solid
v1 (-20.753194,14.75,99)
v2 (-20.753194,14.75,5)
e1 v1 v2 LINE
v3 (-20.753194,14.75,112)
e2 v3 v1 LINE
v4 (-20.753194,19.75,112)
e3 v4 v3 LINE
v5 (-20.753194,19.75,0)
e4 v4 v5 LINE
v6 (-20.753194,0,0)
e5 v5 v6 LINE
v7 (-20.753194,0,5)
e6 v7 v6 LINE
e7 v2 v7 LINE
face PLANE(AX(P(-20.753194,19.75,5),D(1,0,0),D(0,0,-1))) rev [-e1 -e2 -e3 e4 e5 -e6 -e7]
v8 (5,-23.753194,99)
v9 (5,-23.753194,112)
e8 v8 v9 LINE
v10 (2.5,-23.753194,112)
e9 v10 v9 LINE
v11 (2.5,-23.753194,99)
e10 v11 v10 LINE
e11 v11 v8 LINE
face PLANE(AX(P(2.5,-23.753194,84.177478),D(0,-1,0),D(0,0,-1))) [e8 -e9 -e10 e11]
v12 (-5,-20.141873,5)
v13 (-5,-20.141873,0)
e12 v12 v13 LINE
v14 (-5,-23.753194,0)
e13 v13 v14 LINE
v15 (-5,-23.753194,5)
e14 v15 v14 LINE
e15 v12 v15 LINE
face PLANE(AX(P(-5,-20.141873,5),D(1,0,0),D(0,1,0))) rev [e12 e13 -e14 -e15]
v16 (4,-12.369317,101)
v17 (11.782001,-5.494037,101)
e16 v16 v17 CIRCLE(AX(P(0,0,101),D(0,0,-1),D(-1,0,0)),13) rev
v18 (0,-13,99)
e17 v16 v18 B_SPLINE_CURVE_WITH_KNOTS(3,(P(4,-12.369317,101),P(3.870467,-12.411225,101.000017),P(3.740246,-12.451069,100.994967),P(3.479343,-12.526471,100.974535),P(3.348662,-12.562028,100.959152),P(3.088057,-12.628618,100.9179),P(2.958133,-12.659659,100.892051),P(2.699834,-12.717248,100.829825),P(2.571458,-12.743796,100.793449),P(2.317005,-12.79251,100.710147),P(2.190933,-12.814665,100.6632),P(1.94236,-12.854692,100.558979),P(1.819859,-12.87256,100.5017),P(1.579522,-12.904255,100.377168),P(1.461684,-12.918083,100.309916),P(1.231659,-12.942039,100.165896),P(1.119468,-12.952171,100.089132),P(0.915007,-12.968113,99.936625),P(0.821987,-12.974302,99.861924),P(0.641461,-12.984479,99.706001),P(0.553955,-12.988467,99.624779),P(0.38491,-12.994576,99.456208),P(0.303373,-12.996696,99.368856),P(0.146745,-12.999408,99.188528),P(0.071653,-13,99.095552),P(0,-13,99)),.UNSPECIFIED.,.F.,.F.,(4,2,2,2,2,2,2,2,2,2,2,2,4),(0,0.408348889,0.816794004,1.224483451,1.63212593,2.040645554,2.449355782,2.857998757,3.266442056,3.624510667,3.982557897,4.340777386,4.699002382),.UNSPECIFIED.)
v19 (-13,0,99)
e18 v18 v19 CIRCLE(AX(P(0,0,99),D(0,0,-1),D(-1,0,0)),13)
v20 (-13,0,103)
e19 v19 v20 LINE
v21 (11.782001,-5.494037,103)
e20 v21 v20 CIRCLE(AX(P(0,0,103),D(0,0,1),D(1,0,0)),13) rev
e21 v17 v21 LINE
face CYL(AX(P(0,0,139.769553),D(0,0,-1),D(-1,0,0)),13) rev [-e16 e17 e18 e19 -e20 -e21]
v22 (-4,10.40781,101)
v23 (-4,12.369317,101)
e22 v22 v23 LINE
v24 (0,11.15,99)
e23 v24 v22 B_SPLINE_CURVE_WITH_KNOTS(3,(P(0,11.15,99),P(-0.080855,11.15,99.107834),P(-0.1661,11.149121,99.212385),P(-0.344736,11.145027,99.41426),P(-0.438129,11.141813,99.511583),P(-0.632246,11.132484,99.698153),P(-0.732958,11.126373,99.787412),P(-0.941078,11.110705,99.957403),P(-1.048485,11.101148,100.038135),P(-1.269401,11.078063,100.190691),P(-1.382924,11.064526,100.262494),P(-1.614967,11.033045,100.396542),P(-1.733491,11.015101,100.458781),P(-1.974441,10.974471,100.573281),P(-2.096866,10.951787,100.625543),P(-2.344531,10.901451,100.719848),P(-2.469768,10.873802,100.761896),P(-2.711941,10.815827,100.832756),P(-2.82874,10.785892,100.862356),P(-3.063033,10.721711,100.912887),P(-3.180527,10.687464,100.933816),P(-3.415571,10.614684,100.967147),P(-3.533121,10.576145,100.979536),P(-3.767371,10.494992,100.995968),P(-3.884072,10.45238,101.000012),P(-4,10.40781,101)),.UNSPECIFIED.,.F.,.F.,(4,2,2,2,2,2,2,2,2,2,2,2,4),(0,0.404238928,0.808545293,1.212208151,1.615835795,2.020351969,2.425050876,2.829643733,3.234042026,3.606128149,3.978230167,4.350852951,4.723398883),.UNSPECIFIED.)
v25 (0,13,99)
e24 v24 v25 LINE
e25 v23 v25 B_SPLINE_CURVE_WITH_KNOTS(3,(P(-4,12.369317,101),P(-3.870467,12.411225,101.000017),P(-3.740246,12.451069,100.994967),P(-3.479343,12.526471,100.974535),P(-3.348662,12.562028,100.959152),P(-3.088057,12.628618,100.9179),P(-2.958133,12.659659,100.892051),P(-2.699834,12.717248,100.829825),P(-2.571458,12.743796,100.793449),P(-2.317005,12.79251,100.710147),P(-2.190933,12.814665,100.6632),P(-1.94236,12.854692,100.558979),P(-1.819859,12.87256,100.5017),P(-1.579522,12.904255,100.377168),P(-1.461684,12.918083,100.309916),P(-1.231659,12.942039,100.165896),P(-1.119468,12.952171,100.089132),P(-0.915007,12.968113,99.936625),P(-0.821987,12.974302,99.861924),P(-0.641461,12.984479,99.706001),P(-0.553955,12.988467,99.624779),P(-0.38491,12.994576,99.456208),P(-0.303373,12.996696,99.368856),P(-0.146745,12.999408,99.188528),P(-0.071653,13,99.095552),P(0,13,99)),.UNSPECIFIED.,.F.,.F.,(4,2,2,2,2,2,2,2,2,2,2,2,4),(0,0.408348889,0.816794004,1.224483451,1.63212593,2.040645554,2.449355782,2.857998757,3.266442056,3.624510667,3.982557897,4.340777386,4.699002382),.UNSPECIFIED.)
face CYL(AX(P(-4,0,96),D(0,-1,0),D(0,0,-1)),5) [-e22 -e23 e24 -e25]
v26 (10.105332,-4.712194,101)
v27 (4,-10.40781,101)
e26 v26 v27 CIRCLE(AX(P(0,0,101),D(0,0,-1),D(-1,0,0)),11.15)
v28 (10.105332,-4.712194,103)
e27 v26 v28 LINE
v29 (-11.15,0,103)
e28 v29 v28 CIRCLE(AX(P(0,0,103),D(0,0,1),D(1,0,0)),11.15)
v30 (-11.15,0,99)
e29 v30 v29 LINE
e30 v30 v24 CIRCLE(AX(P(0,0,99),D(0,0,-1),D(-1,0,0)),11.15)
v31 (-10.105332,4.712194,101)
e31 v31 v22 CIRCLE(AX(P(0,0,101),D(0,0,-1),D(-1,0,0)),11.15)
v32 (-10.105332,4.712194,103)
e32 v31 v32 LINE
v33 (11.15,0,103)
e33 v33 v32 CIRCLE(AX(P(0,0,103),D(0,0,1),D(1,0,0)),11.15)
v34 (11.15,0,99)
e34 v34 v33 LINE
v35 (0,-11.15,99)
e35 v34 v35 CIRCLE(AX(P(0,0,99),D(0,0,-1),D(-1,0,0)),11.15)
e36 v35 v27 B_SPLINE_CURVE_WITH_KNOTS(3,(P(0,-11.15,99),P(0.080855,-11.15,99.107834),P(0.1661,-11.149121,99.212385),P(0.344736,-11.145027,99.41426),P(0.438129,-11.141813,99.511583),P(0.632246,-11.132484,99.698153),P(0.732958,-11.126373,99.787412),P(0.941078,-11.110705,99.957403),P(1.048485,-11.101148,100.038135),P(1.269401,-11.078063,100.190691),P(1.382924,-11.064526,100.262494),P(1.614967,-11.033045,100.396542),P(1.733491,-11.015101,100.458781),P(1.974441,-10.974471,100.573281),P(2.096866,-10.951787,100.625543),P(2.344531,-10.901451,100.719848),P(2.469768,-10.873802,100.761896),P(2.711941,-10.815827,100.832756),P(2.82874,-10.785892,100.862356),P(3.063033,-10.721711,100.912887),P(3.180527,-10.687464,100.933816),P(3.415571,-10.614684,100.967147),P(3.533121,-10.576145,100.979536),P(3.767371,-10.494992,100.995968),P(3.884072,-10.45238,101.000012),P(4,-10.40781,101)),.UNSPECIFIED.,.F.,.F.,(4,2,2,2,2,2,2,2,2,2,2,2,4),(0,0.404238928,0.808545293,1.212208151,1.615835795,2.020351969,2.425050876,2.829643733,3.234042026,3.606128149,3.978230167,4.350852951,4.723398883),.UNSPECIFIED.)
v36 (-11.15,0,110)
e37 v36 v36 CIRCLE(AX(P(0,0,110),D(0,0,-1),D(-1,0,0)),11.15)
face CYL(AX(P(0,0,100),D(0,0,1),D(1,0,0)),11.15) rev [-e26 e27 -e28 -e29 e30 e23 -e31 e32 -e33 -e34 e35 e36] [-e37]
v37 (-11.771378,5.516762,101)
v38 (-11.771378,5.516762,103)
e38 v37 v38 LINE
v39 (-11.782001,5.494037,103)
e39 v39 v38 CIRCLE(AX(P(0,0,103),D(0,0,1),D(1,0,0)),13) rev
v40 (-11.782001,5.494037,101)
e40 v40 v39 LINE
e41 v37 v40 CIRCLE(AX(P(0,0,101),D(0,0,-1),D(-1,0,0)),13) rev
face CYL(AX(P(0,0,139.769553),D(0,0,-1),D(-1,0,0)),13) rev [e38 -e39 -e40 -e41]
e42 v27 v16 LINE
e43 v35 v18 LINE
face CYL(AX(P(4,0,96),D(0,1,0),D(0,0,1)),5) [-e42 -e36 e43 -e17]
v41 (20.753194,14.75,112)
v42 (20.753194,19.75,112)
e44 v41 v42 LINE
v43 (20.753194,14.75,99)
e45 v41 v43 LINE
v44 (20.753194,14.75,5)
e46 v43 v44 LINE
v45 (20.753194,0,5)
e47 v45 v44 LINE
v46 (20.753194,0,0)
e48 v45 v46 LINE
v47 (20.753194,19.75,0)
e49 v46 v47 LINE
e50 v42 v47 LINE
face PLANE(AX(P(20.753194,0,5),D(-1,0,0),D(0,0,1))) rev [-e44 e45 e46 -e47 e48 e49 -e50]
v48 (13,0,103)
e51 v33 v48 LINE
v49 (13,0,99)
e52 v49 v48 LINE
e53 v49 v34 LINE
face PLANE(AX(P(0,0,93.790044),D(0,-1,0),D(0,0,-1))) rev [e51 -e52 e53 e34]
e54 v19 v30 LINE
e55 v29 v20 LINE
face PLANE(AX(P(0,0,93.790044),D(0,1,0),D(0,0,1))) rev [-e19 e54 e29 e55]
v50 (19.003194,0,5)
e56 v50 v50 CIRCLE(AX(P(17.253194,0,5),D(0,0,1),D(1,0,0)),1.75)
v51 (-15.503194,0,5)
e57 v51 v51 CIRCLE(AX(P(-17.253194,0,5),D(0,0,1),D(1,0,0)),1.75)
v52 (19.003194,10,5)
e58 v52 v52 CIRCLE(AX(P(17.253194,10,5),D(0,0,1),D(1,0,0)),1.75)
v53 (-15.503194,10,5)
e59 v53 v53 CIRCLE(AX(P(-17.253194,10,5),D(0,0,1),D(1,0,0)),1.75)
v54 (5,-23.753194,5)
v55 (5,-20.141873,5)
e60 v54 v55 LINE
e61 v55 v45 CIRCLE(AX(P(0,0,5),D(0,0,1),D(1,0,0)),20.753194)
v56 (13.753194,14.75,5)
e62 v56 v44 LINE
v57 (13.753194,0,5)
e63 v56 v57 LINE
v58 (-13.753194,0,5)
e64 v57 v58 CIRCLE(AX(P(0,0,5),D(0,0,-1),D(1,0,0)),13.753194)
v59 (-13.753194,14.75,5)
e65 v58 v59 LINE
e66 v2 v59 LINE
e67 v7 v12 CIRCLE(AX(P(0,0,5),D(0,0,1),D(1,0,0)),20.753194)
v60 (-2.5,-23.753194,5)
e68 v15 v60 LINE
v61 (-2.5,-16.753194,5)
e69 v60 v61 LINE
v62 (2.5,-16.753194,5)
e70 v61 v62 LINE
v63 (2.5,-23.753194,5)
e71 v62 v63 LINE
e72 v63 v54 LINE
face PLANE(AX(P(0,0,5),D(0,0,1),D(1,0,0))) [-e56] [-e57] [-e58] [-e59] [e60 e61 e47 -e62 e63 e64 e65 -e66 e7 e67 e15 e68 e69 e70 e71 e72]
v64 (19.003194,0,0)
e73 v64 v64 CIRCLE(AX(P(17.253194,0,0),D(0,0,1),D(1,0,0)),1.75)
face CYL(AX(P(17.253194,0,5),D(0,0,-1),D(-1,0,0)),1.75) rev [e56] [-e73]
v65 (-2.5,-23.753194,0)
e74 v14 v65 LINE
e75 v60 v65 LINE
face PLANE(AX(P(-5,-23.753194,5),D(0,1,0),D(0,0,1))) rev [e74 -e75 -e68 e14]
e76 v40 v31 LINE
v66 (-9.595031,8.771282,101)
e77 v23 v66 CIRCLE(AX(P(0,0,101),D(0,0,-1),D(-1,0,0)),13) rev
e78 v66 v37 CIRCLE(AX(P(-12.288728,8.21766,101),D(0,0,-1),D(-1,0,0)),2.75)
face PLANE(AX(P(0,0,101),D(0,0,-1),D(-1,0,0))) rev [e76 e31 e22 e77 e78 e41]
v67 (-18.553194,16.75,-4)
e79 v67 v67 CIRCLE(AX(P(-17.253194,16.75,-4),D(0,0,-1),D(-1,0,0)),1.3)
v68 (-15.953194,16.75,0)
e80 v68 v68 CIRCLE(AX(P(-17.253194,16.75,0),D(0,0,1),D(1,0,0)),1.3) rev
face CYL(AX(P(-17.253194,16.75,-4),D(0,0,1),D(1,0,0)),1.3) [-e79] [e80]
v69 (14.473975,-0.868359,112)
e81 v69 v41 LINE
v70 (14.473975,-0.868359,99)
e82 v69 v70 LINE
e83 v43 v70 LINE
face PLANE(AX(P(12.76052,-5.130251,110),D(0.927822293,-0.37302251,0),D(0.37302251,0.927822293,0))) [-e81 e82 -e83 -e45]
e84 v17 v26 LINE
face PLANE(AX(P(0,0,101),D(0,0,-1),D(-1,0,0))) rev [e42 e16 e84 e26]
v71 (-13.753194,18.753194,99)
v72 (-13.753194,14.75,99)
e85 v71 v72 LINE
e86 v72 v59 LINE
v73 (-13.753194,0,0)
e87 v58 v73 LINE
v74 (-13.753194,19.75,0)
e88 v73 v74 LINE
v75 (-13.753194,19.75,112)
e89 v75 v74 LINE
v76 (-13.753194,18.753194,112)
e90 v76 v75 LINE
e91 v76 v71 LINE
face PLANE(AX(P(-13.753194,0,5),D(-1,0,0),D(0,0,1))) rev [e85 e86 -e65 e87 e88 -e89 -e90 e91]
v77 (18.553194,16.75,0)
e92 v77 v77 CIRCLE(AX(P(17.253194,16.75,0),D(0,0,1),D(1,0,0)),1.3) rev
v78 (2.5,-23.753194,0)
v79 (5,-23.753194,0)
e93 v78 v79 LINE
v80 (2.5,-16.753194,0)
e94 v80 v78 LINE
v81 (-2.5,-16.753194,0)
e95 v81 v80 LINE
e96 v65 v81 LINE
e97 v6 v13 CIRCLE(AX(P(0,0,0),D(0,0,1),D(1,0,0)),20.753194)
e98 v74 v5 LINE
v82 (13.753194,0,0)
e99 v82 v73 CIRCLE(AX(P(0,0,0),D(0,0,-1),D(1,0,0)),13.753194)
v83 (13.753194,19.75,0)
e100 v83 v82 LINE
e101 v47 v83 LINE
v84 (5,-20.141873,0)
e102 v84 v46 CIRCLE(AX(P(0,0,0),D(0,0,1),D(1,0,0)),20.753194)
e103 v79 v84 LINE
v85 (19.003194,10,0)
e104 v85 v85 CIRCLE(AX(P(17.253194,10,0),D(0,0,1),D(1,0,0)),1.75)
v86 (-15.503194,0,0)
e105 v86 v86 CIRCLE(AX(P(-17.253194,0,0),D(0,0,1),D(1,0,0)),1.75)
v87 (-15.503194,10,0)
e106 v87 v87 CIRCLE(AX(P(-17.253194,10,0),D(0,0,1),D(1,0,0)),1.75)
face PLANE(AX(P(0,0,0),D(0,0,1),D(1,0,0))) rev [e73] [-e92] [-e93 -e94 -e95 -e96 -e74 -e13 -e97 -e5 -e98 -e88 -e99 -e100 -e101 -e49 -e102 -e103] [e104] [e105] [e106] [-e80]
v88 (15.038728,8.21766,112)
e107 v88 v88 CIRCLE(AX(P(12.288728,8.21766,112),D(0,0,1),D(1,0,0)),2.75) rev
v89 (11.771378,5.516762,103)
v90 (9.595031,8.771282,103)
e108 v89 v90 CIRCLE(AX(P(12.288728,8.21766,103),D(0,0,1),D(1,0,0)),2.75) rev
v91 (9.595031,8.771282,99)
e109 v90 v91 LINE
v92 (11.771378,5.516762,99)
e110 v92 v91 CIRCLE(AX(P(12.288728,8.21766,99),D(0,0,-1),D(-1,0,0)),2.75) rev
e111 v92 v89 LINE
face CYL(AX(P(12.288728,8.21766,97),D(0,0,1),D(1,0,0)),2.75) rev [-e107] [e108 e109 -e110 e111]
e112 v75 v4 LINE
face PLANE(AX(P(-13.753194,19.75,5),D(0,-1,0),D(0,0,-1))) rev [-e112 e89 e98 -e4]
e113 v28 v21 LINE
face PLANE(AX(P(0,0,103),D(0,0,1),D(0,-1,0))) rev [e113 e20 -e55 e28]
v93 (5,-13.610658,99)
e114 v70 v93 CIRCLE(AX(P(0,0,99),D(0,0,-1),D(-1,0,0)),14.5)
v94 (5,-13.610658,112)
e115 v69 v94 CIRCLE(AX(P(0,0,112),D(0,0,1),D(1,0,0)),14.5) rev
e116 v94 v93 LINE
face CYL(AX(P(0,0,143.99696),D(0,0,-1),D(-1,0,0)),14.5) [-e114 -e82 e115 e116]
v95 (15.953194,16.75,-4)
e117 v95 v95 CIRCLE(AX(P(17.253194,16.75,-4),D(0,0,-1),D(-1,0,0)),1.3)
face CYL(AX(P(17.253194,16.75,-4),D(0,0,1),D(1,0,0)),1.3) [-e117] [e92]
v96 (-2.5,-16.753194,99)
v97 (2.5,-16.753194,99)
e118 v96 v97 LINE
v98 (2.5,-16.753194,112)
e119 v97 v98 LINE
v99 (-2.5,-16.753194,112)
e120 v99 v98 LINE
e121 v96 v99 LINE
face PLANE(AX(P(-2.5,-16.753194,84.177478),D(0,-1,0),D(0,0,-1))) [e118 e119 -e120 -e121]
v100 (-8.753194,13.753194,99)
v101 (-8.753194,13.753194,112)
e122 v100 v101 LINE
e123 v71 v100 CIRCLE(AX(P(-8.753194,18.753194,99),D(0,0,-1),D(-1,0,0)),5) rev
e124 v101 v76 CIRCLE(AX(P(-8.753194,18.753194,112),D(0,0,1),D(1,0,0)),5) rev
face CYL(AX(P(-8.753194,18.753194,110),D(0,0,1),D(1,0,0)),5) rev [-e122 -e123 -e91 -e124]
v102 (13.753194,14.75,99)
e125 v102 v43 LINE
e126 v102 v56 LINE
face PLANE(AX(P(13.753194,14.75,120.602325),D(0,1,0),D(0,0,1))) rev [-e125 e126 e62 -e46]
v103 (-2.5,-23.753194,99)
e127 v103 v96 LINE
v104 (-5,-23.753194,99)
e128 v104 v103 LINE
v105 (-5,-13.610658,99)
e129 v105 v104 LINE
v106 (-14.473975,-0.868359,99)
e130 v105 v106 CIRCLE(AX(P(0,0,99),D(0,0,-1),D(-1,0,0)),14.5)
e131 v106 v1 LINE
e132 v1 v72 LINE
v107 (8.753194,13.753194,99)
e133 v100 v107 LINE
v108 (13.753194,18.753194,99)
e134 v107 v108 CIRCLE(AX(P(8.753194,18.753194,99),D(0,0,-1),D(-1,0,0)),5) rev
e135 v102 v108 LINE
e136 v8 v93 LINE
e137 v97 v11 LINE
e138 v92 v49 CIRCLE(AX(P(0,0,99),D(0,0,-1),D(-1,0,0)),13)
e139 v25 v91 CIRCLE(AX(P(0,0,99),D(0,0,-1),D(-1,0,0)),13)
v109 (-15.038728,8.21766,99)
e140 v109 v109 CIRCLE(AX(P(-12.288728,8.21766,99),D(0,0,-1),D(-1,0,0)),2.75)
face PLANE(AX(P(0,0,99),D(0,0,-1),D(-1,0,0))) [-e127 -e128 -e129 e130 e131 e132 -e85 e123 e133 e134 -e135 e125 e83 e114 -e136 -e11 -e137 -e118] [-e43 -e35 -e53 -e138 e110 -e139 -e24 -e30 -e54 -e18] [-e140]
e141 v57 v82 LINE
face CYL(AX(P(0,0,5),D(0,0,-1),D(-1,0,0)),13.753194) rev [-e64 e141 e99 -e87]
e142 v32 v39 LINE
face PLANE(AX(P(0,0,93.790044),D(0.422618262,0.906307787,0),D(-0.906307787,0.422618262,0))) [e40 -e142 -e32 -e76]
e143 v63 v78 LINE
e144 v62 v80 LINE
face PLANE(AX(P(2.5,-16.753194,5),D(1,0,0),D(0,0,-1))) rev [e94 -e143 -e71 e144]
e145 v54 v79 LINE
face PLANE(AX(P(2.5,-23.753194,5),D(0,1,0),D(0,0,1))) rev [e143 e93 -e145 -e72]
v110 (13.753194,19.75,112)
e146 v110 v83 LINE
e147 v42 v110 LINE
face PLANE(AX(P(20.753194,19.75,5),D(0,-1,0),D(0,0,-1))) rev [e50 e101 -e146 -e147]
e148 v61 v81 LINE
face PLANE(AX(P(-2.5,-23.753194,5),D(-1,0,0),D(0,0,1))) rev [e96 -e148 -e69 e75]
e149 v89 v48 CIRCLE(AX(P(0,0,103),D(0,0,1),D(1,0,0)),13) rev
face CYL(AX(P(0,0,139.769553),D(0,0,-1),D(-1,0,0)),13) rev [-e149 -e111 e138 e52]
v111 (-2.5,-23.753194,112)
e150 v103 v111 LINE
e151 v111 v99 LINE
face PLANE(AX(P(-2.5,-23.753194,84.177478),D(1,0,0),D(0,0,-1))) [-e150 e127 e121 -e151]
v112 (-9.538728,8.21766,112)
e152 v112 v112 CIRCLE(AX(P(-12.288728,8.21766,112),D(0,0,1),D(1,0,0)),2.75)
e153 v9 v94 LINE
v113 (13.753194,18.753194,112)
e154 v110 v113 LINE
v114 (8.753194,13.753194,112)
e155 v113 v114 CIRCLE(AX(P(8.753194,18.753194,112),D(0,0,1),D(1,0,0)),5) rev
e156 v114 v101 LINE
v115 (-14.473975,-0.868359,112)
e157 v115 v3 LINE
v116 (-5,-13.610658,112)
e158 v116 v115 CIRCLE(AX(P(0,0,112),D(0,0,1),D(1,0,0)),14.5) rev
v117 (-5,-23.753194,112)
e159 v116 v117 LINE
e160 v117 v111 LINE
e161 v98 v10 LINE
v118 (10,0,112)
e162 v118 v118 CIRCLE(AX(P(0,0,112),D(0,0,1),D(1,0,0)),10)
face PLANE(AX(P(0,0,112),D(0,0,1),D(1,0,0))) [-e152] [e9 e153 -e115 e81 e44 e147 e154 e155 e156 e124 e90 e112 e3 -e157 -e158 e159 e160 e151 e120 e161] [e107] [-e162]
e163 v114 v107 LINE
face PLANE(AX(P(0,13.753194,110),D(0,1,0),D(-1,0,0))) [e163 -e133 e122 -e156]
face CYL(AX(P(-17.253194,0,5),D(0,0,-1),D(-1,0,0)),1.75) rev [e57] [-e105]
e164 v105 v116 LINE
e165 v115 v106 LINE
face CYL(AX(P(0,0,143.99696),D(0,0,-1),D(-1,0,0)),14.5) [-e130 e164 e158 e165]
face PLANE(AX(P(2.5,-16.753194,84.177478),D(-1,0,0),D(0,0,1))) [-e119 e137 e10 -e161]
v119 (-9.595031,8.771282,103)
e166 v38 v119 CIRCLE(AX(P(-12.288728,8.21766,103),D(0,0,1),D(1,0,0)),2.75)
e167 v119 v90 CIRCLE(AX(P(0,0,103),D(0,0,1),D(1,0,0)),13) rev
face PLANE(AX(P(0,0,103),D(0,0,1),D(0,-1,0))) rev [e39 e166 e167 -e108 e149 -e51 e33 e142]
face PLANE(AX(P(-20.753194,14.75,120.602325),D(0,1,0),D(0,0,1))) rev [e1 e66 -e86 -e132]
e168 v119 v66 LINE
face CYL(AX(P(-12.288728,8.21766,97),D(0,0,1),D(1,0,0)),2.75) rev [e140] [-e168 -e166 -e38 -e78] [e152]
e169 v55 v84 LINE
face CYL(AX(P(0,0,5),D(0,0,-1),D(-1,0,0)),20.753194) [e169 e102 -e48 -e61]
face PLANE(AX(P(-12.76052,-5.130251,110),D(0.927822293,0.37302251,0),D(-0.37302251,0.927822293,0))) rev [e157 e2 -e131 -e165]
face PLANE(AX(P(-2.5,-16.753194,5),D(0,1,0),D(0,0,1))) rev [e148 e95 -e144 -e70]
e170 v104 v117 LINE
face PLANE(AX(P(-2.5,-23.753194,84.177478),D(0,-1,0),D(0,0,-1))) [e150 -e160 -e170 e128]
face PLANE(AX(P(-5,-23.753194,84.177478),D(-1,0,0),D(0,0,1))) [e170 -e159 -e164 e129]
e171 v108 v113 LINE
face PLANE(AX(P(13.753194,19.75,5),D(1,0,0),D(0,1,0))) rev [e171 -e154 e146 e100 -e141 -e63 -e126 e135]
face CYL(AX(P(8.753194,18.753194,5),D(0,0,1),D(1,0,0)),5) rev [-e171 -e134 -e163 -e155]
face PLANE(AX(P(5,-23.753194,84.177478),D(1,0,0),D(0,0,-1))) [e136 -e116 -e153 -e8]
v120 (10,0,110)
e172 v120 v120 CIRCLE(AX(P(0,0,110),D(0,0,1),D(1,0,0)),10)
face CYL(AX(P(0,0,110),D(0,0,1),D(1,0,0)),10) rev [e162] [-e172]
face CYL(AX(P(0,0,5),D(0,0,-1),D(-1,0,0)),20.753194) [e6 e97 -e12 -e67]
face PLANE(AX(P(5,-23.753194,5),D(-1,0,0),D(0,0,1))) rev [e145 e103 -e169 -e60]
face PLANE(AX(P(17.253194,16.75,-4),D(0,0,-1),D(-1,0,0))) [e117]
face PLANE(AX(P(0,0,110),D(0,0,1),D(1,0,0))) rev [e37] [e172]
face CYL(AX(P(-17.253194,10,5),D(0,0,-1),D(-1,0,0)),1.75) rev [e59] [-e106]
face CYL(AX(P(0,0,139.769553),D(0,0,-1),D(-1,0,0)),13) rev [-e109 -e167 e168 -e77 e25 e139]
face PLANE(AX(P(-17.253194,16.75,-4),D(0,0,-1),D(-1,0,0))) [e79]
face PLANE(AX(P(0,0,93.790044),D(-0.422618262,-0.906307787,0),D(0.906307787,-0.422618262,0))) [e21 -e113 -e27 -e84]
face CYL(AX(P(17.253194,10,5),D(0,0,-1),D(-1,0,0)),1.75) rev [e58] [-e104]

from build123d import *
from build123d.topology import SkipClean

# Parameters (mm, degrees)
SKETCH2_R            = 1.75
BOSS_EXTRUDE1_DEPTH  = 5
SKETCH3_R            = 1.3
BOSS_EXTRUDE2_DEPTH  = 4
SKETCH4_W            = 7
SKETCH4_H            = 5
BOSS_EXTRUDE3_DEPTH  = 107
BOSS_EXTRUDE4_START  = -2
SKETCH5_R            = 13.753194099
SKETCH5_R_2          = 10
SKETCH5_W            = 7
SKETCH5_H            = 5
BOSS_EXTRUDE4_DEPTH  = 2
BOSS_EXTRUDE5_START  = 10
SKETCH6_R            = 11.15
BOSS_EXTRUDE5_DEPTH  = 10
CUT_EXTRUDE1_START   = -3
SKETCH7_R            = 13
CUT_EXTRUDE1_DEPTH   = 3
BOSS_EXTRUDE6_DEPTH  = 3
BOSS_EXTRUDE7_DEPTH  = 1
BOSS_EXTRUDE8_START  = -2
BOSS_EXTRUDE8_DEPTH  = 2
FILLET1_R            = 5
BOSS_EXTRUDE9_START  = -13
BOSS_EXTRUDE9_DEPTH  = 13
FILLET3_R            = 5
SKETCH13_R           = 2.75
CUT_EXTRUDE2_DEPTH   = 15
BOSS_EXTRUDE10_DEPTH = 13


with BuildPart() as part:
    # Sketch2 → Boss-Extrude1 (new body)
    with BuildSketch(Plane.XY):
        with BuildLine():
            Line((-2.5, -23.753194099), (-2.5, -16.753194099))
            Line((-2.5, -16.753194099), (2.5, -16.753194099))
            Line((2.5, -16.753194099), (2.5, -23.753194099))
            Line((2.5, -23.753194099), (5, -23.753194099))
            Line((5, -23.753194099), (5, -20.141873431))
            ThreePointArc((5, -20.141873431), (16.34718685, -12.785325472), (20.753194099, 0))
            Line((20.753194099, 0), (20.753194099, 19.75))
            Line((20.753194099, 19.75), (13.753194099, 19.75))
            Line((13.753194099, 19.75), (13.753194099, 0))
            ThreePointArc((13.753194099, 0), (0, -13.753194099), (-13.753194099, 0))
            Line((-13.753194099, 0), (-13.753194099, 19.75))
            Line((-13.753194099, 19.75), (-20.753194099, 19.75))
            Line((-20.753194099, 19.75), (-20.753194099, 0))
            ThreePointArc((-20.753194099, 0), (-16.34718685, -12.785325472), (-5, -20.141873431))
            Line((-5, -20.141873431), (-5, -23.753194099))
            Line((-5, -23.753194099), (-2.5, -23.753194099))
        make_face()
        with Locations((17.253194099, 10)):
            Circle(SKETCH2_R, mode=Mode.SUBTRACT)
        with Locations((17.253194099, 0)):
            Circle(SKETCH2_R, mode=Mode.SUBTRACT)
        with Locations((-17.253194099, 0)):
            Circle(SKETCH2_R, mode=Mode.SUBTRACT)
        with Locations((-17.253194099, 10)):
            Circle(SKETCH2_R, mode=Mode.SUBTRACT)
    extrude(amount=BOSS_EXTRUDE1_DEPTH)

    # Sketch3 → Boss-Extrude2 (add)
    with BuildSketch(Plane(origin=(0, 0, 0), x_dir=(-1, 0, 0), z_dir=(0, 0, -1))):
        with Locations(Location((17.253194099, 16.75, 0), (0, 0, 180))):
            Circle(SKETCH3_R)
        with Locations(Location((-17.253194099, 16.75, 0), (0, 0, 180))):
            Circle(SKETCH3_R)
    extrude(amount=BOSS_EXTRUDE2_DEPTH)

    # Sketch4 → Boss-Extrude3 (add)
    with BuildSketch(Plane.XY.offset(5)):
        with Locations((-17.253194099, 17.25)):
            Rectangle(SKETCH4_W, SKETCH4_H)
        with Locations((17.253194099, 17.25)):
            Rectangle(SKETCH4_W, SKETCH4_H)
    extrude(amount=BOSS_EXTRUDE3_DEPTH)

    # Sketch5 → Boss-Extrude4 (add)
    # profile 1 of 6: a face of its own
    with BuildSketch(Plane.XY.offset(112).offset(BOSS_EXTRUDE4_START)):
        with BuildLine():
            Line((0, 13.753194099), (-13.753194099, 13.753194099))
            Line((-13.753194099, 13.753194099), (-13.753194099, 0))
            ThreePointArc((-13.753194099, 0), (-9.724976811, 9.724976811), (0, 13.753194099))
        make_face()
    # profile 2 of 6: a face of its own
    with BuildSketch(Plane.XY.offset(112).offset(BOSS_EXTRUDE4_START)):
        Circle(SKETCH5_R)
        Circle(SKETCH5_R_2, mode=Mode.SUBTRACT)
    # profile 3 of 6: a face of its own
    with BuildSketch(Plane.XY.offset(112).offset(BOSS_EXTRUDE4_START)):
        with BuildLine():
            Line((13.753194099, 14.75), (13.753194099, 13.753194099))
            Line((13.753194099, 13.753194099), (13.753194099, 0))
            ThreePointArc((13.753194099, 0), (13.502745228, -2.612703434), (12.76052008, -5.13025099))
            Line((12.76052008, -5.13025099), (20.753194099, 14.75))
            Line((20.753194099, 14.75), (13.753194099, 14.75))
        make_face()
    # profile 4 of 6: a face of its own
    with BuildSketch(Plane.XY.offset(112).offset(BOSS_EXTRUDE4_START)):
        with Locations((17.253194099, 17.25)):
            Rectangle(SKETCH5_W, SKETCH5_H)
    # profile 5 of 6: a face of its own
    with BuildSketch(Plane.XY.offset(112).offset(BOSS_EXTRUDE4_START)):
        with BuildLine():
            Line((13.753194099, 13.753194099), (0, 13.753194099))
            ThreePointArc((0, 13.753194099), (9.724976811, 9.724976811), (13.753194099, 0))
            Line((13.753194099, 0), (13.753194099, 13.753194099))
        make_face()
    # profile 6 of 6: a face of its own
    with BuildSketch(Plane.XY.offset(112).offset(BOSS_EXTRUDE4_START)):
        with BuildLine():
            Line((-13.753194099, 13.753194099), (-13.753194099, 19.75))
            Line((-13.753194099, 19.75), (-20.753194099, 19.75))
            Line((-20.753194099, 19.75), (-20.753194099, 14.75))
            Line((-20.753194099, 14.75), (-12.76052008, -5.13025099))
            ThreePointArc((-12.76052008, -5.13025099), (-13.502745228, -2.612703434), (-13.753194099, 0))
            Line((-13.753194099, 0), (-13.753194099, 13.753194099))
        make_face()
    extrude(amount=BOSS_EXTRUDE4_DEPTH)

    # Sketch6 → Boss-Extrude5 (add)
    # profile 1 of 3: a face of its own
    with BuildSketch(Plane(origin=(0, 0, 110), x_dir=(-1, 0, 0), z_dir=(0, 0, -1)).offset(BOSS_EXTRUDE5_START)):
        with BuildLine():
            ThreePointArc((13.753194099, 0), (13.502745228, -2.612703434), (12.76052008, -5.13025099))
            Line((12.76052008, -5.13025099), (20.753194099, 14.75))
            Line((20.753194099, 14.75), (13.753194099, 14.75))
            Line((13.753194099, 14.75), (13.753194099, 13.753194099))
            Line((13.753194099, 13.753194099), (0, 13.753194099))
            ThreePointArc((0, 13.753194099), (9.724976811, 9.724976811), (13.753194099, 0))
        make_face()
    # profile 2 of 3: a face of its own
    with BuildSketch(Plane(origin=(0, 0, 110), x_dir=(-1, 0, 0), z_dir=(0, 0, -1)).offset(BOSS_EXTRUDE5_START)):
        with BuildLine():
            Line((-20.753194099, 14.75), (-12.76052008, -5.13025099))
            ThreePointArc((-12.76052008, -5.13025099), (-11.395343031, 7.700422401), (0, 13.753194099))
            Line((0, 13.753194099), (-13.753194099, 13.753194099))
            Line((-13.753194099, 13.753194099), (-13.753194099, 14.75))
            Line((-13.753194099, 14.75), (-20.753194099, 14.75))
        make_face()
    # profile 3 of 3: a face of its own
    with BuildSketch(Plane(origin=(0, 0, 110), x_dir=(-1, 0, 0), z_dir=(0, 0, -1)).offset(BOSS_EXTRUDE5_START)):
        with BuildLine():
            ThreePointArc((-12.76052008, -5.13025099), (0, -13.753194099), (12.76052008, -5.13025099))
            ThreePointArc((12.76052008, -5.13025099), (13.502745228, -2.612703434), (13.753194099, 0))
            ThreePointArc((13.753194099, 0), (9.724976811, 9.724976811), (0, 13.753194099))
            ThreePointArc((0, 13.753194099), (-11.395343031, 7.700422401), (-12.76052008, -5.13025099))
        make_face()
        Circle(SKETCH6_R, mode=Mode.SUBTRACT)
    extrude(amount=-BOSS_EXTRUDE5_DEPTH)

    # Sketch7 → Cut-Extrude1 (cut)
    with BuildSketch(Plane(origin=(0, 0, 100), x_dir=(-1, 0, 0), z_dir=(0, 0, -1)).offset(CUT_EXTRUDE1_START)):
        Circle(SKETCH7_R)
    extrude(amount=CUT_EXTRUDE1_DEPTH, mode=Mode.SUBTRACT)

    # Sketch8 → Boss-Extrude6 (add)
    with SkipClean():  # the faces are left unmerged after this step: merging them gives an invalid solid
        with BuildSketch(Plane(origin=(0, 0, 103), x_dir=(-1, 0, 0), z_dir=(0, 0, -1))):
            with BuildLine():
                ThreePointArc((10.105331825, 4.712193618), (10.885700479, 2.413301695), (11.15, 0))
                Line((11.15, 0), (13, 0))
                ThreePointArc((13, 0), (12.691848093, 2.813714981), (11.782001231, 5.494037403))
                Line((11.782001231, 5.494037403), (10.105331825, 4.712193618))
            make_face()
            with BuildLine():
                ThreePointArc((-10.105331825, -4.712193618), (-10.885700479, -2.413301695), (-11.15, 0))
                Line((-11.15, 0), (-13, 0))
                ThreePointArc((-13, 0), (-12.691848093, -2.813714981), (-11.782001231, -5.494037403))
                Line((-11.782001231, -5.494037403), (-10.105331825, -4.712193618))
            make_face()
        extrude(amount=BOSS_EXTRUDE6_DEPTH)

    # Sketch9 → Boss-Extrude7 (add)
    with BuildSketch(Plane(origin=(0, 0, 100), x_dir=(-1, 0, 0), z_dir=(0, 0, -1))):
        with BuildLine():
            Line((13.753194099, 13.753194099), (-13.753194099, 13.753194099))
            Line((-13.753194099, 13.753194099), (-13.753194099, 14.75))
            Line((-13.753194099, 14.75), (-20.753194099, 14.75))
            Line((-20.753194099, 14.75), (-12.76052008, -5.13025099))
            ThreePointArc((-12.76052008, -5.13025099), (0, -13.753194099), (12.76052008, -5.13025099))
            Line((12.76052008, -5.13025099), (20.753194099, 14.75))
            Line((20.753194099, 14.75), (13.753194099, 14.75))
            Line((13.753194099, 14.75), (13.753194099, 13.753194099))
        make_face()
        with BuildLine():
            Line((-11.15, 0), (-13, 0))
            ThreePointArc((-13, 0), (-2.813714981, 12.691848093), (11.782001231, 5.494037403))
            Line((11.782001231, 5.494037403), (10.105331825, 4.712193618))
            ThreePointArc((10.105331825, 4.712193618), (10.885700479, 2.413301695), (11.15, 0))
            Line((11.15, 0), (13, 0))
            ThreePointArc((13, 0), (2.813714981, -12.691848093), (-11.782001231, -5.494037403))
            Line((-11.782001231, -5.494037403), (-10.105331825, -4.712193618))
            ThreePointArc((-10.105331825, -4.712193618), (-10.885700479, -2.413301695), (-11.15, 0))
        make_face(mode=Mode.SUBTRACT)
    extrude(amount=BOSS_EXTRUDE7_DEPTH)

    # Sketch10 → Boss-Extrude8 (add)
    with BuildSketch(Plane(origin=(0, 0, 99), x_dir=(-1, 0, 0), z_dir=(0, 0, -1)).offset(BOSS_EXTRUDE8_START)):
        with BuildLine():
            Line((0, 13), (0, 11.15))
            ThreePointArc((0, 11.15), (5.990890633, 9.403814621), (10.105331825, 4.712193618))
            Line((10.105331825, 4.712193618), (11.782001231, 5.494037403))
            ThreePointArc((11.782001231, 5.494037403), (6.984894909, 10.964088796), (0, 13))
        make_face()
        with BuildLine():
            Line((0, -13), (0, -11.15))
            ThreePointArc((0, -11.15), (-5.990890633, -9.403814621), (-10.105331825, -4.712193618))
            Line((-10.105331825, -4.712193618), (-11.782001231, -5.494037403))
            ThreePointArc((-11.782001231, -5.494037403), (-6.984894909, -10.964088796), (0, -13))
        make_face()
    extrude(amount=BOSS_EXTRUDE8_DEPTH)

    # Fillet1
    # the kernel refuses this fillet: 5 mm, written as the material it takes off along each edge
    with BuildSketch(Plane(origin=(0, -23, 101), x_dir=(0, 0, -1), z_dir=(0, 1, 0))) as fillet1_piece_1_section:
        with BuildLine():
            CenterArc((5, -4), FILLET1_R, 126.869897646, 53.130102354)
            Line((0, -4), (0, 0))
            Line((0, 0), (2, 0))
        make_face()
    fillet1_piece_1 = extrude(amount=21.85, mode=Mode.PRIVATE)
    fillet1_piece_1 = fillet1_piece_1 & Plane(origin=(0, 0, 100.481080227), x_dir=(-1, 0, 0), z_dir=(0, 0, 1)) * Cylinder(13, 60, mode=Mode.PRIVATE)
    add(fillet1_piece_1, mode=Mode.SUBTRACT)
    with BuildSketch(Plane(origin=(0, 23, 101), x_dir=(0, 0, -1), z_dir=(0, -1, 0))) as fillet1_piece_2_section:
        with BuildLine():
            CenterArc((5, -4), FILLET1_R, 126.869897646, 53.130102354)
            Line((0, -4), (0, 0))
            Line((0, 0), (2, 0))
        make_face()
    fillet1_piece_2 = extrude(amount=21.85, mode=Mode.PRIVATE)
    fillet1_piece_2 = fillet1_piece_2 & Plane(origin=(0, 0, 100.481080227), x_dir=(1, 0, 0), z_dir=(0, 0, 1)) * Cylinder(13, 60, mode=Mode.PRIVATE)
    add(fillet1_piece_2, mode=Mode.SUBTRACT)

    # Sketch11 → Boss-Extrude9 (add)
    with BuildSketch(Plane.XY.offset(112).offset(BOSS_EXTRUDE9_START)):
        with BuildLine():
            Line((2.5, -16.753194099), (2.5, -23.753194099))
            Line((2.5, -23.753194099), (5, -23.753194099))
            Line((5, -23.753194099), (5, -12.812117231))
            ThreePointArc((5, -12.812117231), (0, -13.753194099), (-5, -12.812117231))
            Line((-5, -12.812117231), (-5, -23.753194099))
            Line((-5, -23.753194099), (-2.5, -23.753194099))
            Line((-2.5, -23.753194099), (-2.5, -16.753194099))
            Line((-2.5, -16.753194099), (2.5, -16.753194099))
        make_face()
    extrude(amount=BOSS_EXTRUDE9_DEPTH)

    # Fillet3
    # the kernel refuses this fillet: 5 mm, written as the material it adds along each edge
    with BuildSketch(Plane(origin=(13.753194099, 13.753194099, 99), x_dir=(0, 1, 0), z_dir=(0, 0, 1)), Plane(origin=(-13.753194099, 13.753194099, 112), x_dir=(0, 1, 0), z_dir=(0, 0, -1))) as fillet3_piece_1:
        with BuildLine():
            CenterArc((FILLET3_R, FILLET3_R), FILLET3_R, 180, 90)
            Line((0, FILLET3_R), (0, 0))
            Line((0, 0), (FILLET3_R, 0))
        make_face()
    extrude(amount=13)

    # Sketch13 → Cut-Extrude2 (cut)
    with BuildSketch(Plane.XY.offset(112)):
        with Locations((-12.288728005, 8.217660193)):
            Circle(SKETCH13_R)
        with Locations((12.288728005, 8.217660193)):
            Circle(SKETCH13_R)
    extrude(amount=-CUT_EXTRUDE2_DEPTH, mode=Mode.SUBTRACT)

    # Sketch14 → Boss-Extrude10 (add)
    with BuildSketch(Plane(origin=(0, 0, 99), x_dir=(-1, 0, 0), z_dir=(0, 0, -1))):
        with BuildLine():
            ThreePointArc((5, -13.610657589), (11.636170752, -8.6515623), (14.473975018, -0.868358893))
            Line((14.473975018, -0.868358893), (12.76052008, -5.13025099))
            ThreePointArc((12.76052008, -5.13025099), (9.675318373, -9.774382964), (5, -12.812117231))
            Line((5, -12.812117231), (5, -13.610657589))
        make_face()
        with BuildLine():
            Line((-5, -12.812117231), (-5, -13.610657589))
            ThreePointArc((-5, -13.610657589), (0, -14.5), (5, -13.610657589))
            Line((5, -13.610657589), (5, -12.812117231))
            ThreePointArc((5, -12.812117231), (0, -13.753194099), (-5, -12.812117231))
        make_face()
        with BuildLine():
            Line((-12.76052008, -5.13025099), (-14.473975018, -0.868358893))
            ThreePointArc((-14.473975018, -0.868358893), (-11.636170752, -8.6515623), (-5, -13.610657589))
            Line((-5, -13.610657589), (-5, -12.812117231))
            ThreePointArc((-5, -12.812117231), (-9.675318373, -9.774382964), (-12.76052008, -5.13025099))
        make_face()
    extrude(amount=-BOSS_EXTRUDE10_DEPTH)


solid = part.part
